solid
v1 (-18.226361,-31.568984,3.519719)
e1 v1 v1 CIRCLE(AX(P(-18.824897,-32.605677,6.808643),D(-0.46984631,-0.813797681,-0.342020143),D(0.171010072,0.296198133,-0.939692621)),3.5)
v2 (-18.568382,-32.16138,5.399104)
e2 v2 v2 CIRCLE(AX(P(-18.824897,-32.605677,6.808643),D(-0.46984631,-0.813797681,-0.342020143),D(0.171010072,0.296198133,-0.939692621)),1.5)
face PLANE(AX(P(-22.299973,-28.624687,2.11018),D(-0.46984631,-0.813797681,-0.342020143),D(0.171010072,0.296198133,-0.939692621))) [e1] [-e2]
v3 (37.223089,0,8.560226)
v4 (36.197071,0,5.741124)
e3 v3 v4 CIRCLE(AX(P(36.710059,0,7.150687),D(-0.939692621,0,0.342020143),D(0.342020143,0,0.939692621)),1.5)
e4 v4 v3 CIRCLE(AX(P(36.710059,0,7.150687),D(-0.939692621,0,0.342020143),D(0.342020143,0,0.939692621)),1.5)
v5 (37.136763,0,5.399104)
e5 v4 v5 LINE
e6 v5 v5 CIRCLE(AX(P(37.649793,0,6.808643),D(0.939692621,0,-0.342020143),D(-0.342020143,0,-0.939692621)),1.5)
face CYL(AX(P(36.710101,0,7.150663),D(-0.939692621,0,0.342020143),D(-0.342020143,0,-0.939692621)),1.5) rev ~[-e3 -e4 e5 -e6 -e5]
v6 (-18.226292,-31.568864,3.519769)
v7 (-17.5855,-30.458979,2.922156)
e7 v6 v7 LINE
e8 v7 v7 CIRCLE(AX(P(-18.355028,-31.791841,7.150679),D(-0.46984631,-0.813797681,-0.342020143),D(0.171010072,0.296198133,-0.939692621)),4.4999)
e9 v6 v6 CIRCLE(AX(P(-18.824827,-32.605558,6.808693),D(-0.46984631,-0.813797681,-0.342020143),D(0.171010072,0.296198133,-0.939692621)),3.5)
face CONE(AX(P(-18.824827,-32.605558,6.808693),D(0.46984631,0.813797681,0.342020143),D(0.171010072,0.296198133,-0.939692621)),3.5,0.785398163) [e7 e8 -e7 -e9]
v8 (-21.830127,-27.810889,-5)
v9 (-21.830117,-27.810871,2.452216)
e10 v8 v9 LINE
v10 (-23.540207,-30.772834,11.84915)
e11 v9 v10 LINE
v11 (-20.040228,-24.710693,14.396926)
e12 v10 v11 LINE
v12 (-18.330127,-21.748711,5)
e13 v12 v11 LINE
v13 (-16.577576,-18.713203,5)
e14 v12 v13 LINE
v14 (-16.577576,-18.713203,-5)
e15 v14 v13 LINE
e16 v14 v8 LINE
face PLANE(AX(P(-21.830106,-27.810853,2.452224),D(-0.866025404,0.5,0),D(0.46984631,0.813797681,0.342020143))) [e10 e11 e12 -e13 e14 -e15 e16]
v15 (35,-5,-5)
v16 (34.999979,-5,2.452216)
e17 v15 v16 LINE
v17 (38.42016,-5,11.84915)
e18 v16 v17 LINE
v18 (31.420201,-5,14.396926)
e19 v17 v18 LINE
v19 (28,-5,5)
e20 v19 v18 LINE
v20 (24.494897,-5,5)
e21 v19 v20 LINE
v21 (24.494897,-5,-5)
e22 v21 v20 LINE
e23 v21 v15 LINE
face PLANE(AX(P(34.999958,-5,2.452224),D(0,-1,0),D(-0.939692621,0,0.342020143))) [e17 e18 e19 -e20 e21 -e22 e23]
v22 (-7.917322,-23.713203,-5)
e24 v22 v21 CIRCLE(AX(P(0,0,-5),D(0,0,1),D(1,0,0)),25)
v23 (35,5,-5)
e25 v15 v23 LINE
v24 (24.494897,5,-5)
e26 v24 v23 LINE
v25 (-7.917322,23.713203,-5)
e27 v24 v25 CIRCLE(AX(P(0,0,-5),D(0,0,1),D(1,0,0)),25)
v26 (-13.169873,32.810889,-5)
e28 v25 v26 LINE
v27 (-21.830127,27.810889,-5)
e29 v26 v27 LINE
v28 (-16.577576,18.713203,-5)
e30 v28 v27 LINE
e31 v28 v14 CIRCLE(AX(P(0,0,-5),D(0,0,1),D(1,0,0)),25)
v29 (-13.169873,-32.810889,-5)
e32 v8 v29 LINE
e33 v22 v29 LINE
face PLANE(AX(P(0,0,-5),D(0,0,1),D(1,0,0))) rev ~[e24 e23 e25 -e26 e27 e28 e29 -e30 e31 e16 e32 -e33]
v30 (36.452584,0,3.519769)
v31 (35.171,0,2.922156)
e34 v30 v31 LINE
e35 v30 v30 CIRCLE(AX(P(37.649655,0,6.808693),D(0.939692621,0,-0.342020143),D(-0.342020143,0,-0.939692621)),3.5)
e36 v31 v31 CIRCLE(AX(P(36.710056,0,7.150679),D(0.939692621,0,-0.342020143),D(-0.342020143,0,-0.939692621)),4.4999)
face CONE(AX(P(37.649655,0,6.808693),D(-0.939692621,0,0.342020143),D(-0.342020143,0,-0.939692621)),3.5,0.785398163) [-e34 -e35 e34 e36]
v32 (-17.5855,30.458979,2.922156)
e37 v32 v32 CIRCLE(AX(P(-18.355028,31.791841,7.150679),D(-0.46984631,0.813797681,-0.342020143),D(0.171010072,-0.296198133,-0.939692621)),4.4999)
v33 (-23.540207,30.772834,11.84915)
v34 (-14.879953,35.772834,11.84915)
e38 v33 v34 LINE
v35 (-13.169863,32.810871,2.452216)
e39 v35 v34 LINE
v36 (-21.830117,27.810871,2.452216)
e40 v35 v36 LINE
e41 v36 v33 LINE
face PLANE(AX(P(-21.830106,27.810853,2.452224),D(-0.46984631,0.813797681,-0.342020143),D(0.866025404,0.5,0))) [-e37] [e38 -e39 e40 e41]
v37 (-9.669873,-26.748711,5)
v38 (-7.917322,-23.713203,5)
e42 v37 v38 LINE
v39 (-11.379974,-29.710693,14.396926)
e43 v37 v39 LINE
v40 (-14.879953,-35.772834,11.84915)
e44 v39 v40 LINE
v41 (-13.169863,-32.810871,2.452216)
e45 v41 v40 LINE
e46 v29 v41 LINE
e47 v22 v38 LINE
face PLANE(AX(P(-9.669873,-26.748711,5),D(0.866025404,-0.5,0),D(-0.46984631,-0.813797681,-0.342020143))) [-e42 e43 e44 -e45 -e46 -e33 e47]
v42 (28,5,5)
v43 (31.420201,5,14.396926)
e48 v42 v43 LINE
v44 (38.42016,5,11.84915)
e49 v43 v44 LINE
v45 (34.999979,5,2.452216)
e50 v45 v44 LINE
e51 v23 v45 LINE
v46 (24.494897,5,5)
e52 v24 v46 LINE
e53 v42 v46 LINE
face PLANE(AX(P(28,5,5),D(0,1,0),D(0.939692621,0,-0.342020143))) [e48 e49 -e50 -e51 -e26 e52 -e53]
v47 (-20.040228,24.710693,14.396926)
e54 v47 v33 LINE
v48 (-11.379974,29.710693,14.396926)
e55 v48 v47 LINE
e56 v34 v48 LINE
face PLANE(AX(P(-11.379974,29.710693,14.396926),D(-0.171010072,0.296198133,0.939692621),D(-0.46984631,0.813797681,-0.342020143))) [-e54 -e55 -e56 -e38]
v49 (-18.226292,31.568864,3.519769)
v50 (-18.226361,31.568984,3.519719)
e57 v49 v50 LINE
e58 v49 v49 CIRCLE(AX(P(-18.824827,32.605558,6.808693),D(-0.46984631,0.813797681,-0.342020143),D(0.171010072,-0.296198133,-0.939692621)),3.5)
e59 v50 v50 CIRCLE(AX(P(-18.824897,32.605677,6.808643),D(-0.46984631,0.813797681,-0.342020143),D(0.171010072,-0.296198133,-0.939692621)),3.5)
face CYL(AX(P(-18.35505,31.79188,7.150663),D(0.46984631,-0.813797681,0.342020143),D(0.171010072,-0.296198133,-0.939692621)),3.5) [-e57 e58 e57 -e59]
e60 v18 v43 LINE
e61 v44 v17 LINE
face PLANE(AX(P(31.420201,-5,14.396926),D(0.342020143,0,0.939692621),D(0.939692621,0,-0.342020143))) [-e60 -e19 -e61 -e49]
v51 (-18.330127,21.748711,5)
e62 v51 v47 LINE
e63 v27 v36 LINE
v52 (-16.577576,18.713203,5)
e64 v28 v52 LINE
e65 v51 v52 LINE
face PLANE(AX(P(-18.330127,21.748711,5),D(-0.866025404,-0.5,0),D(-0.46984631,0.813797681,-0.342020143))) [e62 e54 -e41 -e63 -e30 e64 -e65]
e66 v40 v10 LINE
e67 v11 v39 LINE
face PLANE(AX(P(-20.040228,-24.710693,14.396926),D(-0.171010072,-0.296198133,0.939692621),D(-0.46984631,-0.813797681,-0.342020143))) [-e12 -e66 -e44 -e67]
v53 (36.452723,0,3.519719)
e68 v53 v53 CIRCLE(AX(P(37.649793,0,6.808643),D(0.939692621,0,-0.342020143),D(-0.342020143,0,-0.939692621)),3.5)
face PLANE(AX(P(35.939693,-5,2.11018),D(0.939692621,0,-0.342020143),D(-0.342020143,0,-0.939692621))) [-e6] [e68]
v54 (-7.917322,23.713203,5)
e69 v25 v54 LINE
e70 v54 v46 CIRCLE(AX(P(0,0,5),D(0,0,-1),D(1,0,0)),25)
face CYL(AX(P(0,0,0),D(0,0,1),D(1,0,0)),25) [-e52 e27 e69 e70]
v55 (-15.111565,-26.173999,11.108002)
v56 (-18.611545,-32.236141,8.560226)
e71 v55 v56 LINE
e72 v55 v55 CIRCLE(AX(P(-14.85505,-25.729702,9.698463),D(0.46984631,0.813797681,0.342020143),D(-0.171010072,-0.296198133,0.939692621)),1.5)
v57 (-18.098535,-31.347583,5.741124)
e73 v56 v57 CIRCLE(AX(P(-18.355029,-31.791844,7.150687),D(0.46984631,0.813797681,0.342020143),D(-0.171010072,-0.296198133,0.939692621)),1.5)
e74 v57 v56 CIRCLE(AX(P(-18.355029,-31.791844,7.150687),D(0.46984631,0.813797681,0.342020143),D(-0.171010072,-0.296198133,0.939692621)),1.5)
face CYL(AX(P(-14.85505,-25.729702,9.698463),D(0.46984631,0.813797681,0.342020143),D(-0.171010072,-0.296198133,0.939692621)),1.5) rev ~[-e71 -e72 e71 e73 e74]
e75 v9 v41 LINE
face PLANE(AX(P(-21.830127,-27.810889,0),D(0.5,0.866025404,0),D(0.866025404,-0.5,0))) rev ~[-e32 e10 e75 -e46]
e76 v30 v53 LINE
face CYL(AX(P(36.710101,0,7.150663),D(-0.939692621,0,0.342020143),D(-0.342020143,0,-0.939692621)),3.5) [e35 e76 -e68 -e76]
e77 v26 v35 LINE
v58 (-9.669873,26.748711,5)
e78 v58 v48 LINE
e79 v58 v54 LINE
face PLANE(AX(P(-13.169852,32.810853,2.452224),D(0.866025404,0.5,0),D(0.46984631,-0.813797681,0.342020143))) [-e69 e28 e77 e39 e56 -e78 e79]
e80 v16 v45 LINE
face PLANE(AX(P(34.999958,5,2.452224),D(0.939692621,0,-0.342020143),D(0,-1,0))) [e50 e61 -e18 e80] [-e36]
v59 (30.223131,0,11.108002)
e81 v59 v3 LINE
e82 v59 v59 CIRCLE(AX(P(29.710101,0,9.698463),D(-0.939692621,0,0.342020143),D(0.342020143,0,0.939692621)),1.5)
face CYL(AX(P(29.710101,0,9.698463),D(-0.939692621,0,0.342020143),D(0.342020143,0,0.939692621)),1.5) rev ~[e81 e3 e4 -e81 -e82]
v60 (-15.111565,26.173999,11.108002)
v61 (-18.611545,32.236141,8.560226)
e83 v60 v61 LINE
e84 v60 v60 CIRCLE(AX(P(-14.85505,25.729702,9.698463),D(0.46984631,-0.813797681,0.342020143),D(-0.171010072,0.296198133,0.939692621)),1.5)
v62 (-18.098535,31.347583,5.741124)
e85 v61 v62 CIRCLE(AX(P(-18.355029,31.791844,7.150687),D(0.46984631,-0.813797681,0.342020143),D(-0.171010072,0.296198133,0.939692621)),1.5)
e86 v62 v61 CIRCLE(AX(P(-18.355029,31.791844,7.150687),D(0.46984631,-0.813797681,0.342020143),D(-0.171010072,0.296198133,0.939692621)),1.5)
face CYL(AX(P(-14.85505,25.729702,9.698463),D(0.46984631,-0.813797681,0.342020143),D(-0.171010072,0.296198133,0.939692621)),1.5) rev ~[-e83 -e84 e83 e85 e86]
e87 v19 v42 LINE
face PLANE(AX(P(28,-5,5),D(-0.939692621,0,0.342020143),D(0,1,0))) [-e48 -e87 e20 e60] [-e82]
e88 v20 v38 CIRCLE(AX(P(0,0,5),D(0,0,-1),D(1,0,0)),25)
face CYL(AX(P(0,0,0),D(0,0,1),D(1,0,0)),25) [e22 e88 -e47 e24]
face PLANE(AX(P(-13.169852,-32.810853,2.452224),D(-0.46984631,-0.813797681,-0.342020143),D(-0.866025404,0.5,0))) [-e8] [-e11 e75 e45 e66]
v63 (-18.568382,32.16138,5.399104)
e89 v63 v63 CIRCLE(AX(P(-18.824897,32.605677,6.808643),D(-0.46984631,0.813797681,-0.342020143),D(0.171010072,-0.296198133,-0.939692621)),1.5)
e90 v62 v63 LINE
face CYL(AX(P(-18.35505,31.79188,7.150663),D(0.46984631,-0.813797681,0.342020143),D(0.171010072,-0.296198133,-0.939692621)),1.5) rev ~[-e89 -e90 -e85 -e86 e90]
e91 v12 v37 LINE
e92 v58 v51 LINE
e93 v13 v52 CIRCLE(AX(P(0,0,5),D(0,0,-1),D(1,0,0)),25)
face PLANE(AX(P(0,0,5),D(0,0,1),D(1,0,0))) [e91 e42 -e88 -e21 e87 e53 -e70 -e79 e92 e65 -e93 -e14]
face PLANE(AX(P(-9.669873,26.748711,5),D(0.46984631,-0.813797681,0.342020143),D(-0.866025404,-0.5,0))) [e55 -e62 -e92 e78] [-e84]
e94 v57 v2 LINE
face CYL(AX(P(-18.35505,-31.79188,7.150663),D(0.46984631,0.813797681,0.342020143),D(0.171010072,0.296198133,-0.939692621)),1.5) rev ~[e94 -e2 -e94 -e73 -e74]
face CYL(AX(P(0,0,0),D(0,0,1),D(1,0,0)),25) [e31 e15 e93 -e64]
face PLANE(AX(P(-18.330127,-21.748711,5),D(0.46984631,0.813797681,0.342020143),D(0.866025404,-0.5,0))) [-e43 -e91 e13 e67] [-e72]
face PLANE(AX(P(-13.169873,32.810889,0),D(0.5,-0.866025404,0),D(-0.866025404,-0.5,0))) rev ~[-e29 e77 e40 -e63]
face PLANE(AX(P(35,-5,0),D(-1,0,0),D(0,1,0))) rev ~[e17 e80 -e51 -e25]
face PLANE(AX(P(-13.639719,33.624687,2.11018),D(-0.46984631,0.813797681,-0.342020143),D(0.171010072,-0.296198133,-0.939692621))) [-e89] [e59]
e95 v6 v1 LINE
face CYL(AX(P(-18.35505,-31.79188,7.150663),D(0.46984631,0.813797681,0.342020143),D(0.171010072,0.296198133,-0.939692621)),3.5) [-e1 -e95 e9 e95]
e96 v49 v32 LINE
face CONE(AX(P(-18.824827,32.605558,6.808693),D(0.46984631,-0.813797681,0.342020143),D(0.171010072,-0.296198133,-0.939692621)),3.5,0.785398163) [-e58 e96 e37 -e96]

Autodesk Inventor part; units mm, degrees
ref_plane "YZ Plane" through (0, 0, 0) normal (1, 0, 0) x (0, 1, 0)
ref_plane "XZ Plane" through (0, 0, 0) normal (0, 1, 0) x (-1, 0, 0)
ref_plane "XY Plane" through (0, 0, 0) normal (0, 0, 1) x (1, 0, 0)
sketch "Sketch1" plane through (0, 0, 0) normal (0, 0, 1) x (1, 0, 0)
  circle A0 centre (0, 0) radius 25
  line L0 (15, -5) -> (35, -5)
  line L1 (35, -5) -> (35, 5)
  line L2 (35, 5) -> (15, 5)
  line L3 (15, 5) -> (15, -5)
  line L4 (15, -5) -> (35, 5) construction
  line L5 (35, -5) -> (15, 5) construction
  point P0 (25, 0)
  dimension "d0" = 50
  dimension "d3" = 10
  dimension "d4" = 20
  dimension "d5" = 0
extrude "Extrusion1" add sketch "Sketch1" along normal mid plane 10 contours A0 L0 L3 L2 | L2 L3 L0 A0
extrude "Extrusion2" add sketch "Sketch1" along normal mid plane 10 contours A0 L0 L3 L2 | A0 L2 L1 L0 picked at (18.3333, 0)
chamfer "Chamfer1" distance 7 angle 20 1 edges at (35, 0, 5) measured on face at (6.5398, 14.4203, 5)
sketch "Sketch2" plane through (28, -5, 5) normal (0.3420201, 0, 0.9396926) x (0.9396926, 0, -0.3420201)
  line L0 (7.4492, 0) -> (0, 0)
  line L1 (0, 0) -> (0, 10)
  line L2 (0, 10) -> (7.4492, 10)
  line L3 (7.4492, 10) -> (7.4492, 0)
  line L4 (7.4492, 0) -> (0, 10) construction
  line L5 (0, 0) -> (7.4492, 10) construction
  line L6 (0, 10) -> (0, 0) projected
  line L7 (7.4492, 0) -> (7.4492, 10) projected
  line L8 (7.4492, 10) -> (0, 10) projected
  line L9 (0, 0) -> (7.4492, 0) projected
  point P0 (-24.6013, 5)
  point P1 (3.7246, 5)
  dimension "d11" = 0
  dimension "d12" = 0
  dimension "d13" = 0
  dimension "d14" = 0
extrude "Extrusion3" add sketch "Sketch2" along normal blind 10
sketch "Sketch3" plane through (28, -5, 5) normal (-0.9396926, 0, 0.3420201) x (0.3420201, 0, 0.9396926)
  circle A0 centre (5, 5) radius 1.5
  line L0 (10, 10) -> (10, 0) projected
  line L1 (0, 10) -> (0, 0) projected
  line L2 (0, 0) -> (10, 0) projected
  line L3 (0, 10) -> (10, 10) projected
  point P0 (-14.275, 5)
  dimension "d17" = 3
  dimension "d18" = 5
  dimension "d19" = 5
  dimension "d20" = 5
  dimension "d21" = 5
extrude "Extrusion8" cut sketch "Sketch3" against normal through all contours A0
sketch "Sketch6" plane through (35, -5, 2.4522) normal (0.9396926, 0, -0.3420201) x (-0.3420201, 0, -0.9396926)
  circle A0 centre (-5, 5) radius 3.5
  circle A1 centre (-5, 5) radius 1.5 projected
  point P0 (14.275, 5)
  dimension "d40" = 7
extrude "Extrusion9" add sketch "Sketch6" along normal blind 1
chamfer "Chamfer3" distance 1 angle 45 1 edges at (37.9072, 0, 10.4396)
pattern_circular "Circular Pattern1" count 3 over 360 about axis through (0, 0, 0) along (0, 0, 1) of "Extrusion3", "Extrusion2", "Chamfer1", "Extrusion8", "Chamfer3", "Extrusion9"
equation "\"d18\" = d19"
equation "\"d20\" = d21"
properties part number "BottomPlatform"
